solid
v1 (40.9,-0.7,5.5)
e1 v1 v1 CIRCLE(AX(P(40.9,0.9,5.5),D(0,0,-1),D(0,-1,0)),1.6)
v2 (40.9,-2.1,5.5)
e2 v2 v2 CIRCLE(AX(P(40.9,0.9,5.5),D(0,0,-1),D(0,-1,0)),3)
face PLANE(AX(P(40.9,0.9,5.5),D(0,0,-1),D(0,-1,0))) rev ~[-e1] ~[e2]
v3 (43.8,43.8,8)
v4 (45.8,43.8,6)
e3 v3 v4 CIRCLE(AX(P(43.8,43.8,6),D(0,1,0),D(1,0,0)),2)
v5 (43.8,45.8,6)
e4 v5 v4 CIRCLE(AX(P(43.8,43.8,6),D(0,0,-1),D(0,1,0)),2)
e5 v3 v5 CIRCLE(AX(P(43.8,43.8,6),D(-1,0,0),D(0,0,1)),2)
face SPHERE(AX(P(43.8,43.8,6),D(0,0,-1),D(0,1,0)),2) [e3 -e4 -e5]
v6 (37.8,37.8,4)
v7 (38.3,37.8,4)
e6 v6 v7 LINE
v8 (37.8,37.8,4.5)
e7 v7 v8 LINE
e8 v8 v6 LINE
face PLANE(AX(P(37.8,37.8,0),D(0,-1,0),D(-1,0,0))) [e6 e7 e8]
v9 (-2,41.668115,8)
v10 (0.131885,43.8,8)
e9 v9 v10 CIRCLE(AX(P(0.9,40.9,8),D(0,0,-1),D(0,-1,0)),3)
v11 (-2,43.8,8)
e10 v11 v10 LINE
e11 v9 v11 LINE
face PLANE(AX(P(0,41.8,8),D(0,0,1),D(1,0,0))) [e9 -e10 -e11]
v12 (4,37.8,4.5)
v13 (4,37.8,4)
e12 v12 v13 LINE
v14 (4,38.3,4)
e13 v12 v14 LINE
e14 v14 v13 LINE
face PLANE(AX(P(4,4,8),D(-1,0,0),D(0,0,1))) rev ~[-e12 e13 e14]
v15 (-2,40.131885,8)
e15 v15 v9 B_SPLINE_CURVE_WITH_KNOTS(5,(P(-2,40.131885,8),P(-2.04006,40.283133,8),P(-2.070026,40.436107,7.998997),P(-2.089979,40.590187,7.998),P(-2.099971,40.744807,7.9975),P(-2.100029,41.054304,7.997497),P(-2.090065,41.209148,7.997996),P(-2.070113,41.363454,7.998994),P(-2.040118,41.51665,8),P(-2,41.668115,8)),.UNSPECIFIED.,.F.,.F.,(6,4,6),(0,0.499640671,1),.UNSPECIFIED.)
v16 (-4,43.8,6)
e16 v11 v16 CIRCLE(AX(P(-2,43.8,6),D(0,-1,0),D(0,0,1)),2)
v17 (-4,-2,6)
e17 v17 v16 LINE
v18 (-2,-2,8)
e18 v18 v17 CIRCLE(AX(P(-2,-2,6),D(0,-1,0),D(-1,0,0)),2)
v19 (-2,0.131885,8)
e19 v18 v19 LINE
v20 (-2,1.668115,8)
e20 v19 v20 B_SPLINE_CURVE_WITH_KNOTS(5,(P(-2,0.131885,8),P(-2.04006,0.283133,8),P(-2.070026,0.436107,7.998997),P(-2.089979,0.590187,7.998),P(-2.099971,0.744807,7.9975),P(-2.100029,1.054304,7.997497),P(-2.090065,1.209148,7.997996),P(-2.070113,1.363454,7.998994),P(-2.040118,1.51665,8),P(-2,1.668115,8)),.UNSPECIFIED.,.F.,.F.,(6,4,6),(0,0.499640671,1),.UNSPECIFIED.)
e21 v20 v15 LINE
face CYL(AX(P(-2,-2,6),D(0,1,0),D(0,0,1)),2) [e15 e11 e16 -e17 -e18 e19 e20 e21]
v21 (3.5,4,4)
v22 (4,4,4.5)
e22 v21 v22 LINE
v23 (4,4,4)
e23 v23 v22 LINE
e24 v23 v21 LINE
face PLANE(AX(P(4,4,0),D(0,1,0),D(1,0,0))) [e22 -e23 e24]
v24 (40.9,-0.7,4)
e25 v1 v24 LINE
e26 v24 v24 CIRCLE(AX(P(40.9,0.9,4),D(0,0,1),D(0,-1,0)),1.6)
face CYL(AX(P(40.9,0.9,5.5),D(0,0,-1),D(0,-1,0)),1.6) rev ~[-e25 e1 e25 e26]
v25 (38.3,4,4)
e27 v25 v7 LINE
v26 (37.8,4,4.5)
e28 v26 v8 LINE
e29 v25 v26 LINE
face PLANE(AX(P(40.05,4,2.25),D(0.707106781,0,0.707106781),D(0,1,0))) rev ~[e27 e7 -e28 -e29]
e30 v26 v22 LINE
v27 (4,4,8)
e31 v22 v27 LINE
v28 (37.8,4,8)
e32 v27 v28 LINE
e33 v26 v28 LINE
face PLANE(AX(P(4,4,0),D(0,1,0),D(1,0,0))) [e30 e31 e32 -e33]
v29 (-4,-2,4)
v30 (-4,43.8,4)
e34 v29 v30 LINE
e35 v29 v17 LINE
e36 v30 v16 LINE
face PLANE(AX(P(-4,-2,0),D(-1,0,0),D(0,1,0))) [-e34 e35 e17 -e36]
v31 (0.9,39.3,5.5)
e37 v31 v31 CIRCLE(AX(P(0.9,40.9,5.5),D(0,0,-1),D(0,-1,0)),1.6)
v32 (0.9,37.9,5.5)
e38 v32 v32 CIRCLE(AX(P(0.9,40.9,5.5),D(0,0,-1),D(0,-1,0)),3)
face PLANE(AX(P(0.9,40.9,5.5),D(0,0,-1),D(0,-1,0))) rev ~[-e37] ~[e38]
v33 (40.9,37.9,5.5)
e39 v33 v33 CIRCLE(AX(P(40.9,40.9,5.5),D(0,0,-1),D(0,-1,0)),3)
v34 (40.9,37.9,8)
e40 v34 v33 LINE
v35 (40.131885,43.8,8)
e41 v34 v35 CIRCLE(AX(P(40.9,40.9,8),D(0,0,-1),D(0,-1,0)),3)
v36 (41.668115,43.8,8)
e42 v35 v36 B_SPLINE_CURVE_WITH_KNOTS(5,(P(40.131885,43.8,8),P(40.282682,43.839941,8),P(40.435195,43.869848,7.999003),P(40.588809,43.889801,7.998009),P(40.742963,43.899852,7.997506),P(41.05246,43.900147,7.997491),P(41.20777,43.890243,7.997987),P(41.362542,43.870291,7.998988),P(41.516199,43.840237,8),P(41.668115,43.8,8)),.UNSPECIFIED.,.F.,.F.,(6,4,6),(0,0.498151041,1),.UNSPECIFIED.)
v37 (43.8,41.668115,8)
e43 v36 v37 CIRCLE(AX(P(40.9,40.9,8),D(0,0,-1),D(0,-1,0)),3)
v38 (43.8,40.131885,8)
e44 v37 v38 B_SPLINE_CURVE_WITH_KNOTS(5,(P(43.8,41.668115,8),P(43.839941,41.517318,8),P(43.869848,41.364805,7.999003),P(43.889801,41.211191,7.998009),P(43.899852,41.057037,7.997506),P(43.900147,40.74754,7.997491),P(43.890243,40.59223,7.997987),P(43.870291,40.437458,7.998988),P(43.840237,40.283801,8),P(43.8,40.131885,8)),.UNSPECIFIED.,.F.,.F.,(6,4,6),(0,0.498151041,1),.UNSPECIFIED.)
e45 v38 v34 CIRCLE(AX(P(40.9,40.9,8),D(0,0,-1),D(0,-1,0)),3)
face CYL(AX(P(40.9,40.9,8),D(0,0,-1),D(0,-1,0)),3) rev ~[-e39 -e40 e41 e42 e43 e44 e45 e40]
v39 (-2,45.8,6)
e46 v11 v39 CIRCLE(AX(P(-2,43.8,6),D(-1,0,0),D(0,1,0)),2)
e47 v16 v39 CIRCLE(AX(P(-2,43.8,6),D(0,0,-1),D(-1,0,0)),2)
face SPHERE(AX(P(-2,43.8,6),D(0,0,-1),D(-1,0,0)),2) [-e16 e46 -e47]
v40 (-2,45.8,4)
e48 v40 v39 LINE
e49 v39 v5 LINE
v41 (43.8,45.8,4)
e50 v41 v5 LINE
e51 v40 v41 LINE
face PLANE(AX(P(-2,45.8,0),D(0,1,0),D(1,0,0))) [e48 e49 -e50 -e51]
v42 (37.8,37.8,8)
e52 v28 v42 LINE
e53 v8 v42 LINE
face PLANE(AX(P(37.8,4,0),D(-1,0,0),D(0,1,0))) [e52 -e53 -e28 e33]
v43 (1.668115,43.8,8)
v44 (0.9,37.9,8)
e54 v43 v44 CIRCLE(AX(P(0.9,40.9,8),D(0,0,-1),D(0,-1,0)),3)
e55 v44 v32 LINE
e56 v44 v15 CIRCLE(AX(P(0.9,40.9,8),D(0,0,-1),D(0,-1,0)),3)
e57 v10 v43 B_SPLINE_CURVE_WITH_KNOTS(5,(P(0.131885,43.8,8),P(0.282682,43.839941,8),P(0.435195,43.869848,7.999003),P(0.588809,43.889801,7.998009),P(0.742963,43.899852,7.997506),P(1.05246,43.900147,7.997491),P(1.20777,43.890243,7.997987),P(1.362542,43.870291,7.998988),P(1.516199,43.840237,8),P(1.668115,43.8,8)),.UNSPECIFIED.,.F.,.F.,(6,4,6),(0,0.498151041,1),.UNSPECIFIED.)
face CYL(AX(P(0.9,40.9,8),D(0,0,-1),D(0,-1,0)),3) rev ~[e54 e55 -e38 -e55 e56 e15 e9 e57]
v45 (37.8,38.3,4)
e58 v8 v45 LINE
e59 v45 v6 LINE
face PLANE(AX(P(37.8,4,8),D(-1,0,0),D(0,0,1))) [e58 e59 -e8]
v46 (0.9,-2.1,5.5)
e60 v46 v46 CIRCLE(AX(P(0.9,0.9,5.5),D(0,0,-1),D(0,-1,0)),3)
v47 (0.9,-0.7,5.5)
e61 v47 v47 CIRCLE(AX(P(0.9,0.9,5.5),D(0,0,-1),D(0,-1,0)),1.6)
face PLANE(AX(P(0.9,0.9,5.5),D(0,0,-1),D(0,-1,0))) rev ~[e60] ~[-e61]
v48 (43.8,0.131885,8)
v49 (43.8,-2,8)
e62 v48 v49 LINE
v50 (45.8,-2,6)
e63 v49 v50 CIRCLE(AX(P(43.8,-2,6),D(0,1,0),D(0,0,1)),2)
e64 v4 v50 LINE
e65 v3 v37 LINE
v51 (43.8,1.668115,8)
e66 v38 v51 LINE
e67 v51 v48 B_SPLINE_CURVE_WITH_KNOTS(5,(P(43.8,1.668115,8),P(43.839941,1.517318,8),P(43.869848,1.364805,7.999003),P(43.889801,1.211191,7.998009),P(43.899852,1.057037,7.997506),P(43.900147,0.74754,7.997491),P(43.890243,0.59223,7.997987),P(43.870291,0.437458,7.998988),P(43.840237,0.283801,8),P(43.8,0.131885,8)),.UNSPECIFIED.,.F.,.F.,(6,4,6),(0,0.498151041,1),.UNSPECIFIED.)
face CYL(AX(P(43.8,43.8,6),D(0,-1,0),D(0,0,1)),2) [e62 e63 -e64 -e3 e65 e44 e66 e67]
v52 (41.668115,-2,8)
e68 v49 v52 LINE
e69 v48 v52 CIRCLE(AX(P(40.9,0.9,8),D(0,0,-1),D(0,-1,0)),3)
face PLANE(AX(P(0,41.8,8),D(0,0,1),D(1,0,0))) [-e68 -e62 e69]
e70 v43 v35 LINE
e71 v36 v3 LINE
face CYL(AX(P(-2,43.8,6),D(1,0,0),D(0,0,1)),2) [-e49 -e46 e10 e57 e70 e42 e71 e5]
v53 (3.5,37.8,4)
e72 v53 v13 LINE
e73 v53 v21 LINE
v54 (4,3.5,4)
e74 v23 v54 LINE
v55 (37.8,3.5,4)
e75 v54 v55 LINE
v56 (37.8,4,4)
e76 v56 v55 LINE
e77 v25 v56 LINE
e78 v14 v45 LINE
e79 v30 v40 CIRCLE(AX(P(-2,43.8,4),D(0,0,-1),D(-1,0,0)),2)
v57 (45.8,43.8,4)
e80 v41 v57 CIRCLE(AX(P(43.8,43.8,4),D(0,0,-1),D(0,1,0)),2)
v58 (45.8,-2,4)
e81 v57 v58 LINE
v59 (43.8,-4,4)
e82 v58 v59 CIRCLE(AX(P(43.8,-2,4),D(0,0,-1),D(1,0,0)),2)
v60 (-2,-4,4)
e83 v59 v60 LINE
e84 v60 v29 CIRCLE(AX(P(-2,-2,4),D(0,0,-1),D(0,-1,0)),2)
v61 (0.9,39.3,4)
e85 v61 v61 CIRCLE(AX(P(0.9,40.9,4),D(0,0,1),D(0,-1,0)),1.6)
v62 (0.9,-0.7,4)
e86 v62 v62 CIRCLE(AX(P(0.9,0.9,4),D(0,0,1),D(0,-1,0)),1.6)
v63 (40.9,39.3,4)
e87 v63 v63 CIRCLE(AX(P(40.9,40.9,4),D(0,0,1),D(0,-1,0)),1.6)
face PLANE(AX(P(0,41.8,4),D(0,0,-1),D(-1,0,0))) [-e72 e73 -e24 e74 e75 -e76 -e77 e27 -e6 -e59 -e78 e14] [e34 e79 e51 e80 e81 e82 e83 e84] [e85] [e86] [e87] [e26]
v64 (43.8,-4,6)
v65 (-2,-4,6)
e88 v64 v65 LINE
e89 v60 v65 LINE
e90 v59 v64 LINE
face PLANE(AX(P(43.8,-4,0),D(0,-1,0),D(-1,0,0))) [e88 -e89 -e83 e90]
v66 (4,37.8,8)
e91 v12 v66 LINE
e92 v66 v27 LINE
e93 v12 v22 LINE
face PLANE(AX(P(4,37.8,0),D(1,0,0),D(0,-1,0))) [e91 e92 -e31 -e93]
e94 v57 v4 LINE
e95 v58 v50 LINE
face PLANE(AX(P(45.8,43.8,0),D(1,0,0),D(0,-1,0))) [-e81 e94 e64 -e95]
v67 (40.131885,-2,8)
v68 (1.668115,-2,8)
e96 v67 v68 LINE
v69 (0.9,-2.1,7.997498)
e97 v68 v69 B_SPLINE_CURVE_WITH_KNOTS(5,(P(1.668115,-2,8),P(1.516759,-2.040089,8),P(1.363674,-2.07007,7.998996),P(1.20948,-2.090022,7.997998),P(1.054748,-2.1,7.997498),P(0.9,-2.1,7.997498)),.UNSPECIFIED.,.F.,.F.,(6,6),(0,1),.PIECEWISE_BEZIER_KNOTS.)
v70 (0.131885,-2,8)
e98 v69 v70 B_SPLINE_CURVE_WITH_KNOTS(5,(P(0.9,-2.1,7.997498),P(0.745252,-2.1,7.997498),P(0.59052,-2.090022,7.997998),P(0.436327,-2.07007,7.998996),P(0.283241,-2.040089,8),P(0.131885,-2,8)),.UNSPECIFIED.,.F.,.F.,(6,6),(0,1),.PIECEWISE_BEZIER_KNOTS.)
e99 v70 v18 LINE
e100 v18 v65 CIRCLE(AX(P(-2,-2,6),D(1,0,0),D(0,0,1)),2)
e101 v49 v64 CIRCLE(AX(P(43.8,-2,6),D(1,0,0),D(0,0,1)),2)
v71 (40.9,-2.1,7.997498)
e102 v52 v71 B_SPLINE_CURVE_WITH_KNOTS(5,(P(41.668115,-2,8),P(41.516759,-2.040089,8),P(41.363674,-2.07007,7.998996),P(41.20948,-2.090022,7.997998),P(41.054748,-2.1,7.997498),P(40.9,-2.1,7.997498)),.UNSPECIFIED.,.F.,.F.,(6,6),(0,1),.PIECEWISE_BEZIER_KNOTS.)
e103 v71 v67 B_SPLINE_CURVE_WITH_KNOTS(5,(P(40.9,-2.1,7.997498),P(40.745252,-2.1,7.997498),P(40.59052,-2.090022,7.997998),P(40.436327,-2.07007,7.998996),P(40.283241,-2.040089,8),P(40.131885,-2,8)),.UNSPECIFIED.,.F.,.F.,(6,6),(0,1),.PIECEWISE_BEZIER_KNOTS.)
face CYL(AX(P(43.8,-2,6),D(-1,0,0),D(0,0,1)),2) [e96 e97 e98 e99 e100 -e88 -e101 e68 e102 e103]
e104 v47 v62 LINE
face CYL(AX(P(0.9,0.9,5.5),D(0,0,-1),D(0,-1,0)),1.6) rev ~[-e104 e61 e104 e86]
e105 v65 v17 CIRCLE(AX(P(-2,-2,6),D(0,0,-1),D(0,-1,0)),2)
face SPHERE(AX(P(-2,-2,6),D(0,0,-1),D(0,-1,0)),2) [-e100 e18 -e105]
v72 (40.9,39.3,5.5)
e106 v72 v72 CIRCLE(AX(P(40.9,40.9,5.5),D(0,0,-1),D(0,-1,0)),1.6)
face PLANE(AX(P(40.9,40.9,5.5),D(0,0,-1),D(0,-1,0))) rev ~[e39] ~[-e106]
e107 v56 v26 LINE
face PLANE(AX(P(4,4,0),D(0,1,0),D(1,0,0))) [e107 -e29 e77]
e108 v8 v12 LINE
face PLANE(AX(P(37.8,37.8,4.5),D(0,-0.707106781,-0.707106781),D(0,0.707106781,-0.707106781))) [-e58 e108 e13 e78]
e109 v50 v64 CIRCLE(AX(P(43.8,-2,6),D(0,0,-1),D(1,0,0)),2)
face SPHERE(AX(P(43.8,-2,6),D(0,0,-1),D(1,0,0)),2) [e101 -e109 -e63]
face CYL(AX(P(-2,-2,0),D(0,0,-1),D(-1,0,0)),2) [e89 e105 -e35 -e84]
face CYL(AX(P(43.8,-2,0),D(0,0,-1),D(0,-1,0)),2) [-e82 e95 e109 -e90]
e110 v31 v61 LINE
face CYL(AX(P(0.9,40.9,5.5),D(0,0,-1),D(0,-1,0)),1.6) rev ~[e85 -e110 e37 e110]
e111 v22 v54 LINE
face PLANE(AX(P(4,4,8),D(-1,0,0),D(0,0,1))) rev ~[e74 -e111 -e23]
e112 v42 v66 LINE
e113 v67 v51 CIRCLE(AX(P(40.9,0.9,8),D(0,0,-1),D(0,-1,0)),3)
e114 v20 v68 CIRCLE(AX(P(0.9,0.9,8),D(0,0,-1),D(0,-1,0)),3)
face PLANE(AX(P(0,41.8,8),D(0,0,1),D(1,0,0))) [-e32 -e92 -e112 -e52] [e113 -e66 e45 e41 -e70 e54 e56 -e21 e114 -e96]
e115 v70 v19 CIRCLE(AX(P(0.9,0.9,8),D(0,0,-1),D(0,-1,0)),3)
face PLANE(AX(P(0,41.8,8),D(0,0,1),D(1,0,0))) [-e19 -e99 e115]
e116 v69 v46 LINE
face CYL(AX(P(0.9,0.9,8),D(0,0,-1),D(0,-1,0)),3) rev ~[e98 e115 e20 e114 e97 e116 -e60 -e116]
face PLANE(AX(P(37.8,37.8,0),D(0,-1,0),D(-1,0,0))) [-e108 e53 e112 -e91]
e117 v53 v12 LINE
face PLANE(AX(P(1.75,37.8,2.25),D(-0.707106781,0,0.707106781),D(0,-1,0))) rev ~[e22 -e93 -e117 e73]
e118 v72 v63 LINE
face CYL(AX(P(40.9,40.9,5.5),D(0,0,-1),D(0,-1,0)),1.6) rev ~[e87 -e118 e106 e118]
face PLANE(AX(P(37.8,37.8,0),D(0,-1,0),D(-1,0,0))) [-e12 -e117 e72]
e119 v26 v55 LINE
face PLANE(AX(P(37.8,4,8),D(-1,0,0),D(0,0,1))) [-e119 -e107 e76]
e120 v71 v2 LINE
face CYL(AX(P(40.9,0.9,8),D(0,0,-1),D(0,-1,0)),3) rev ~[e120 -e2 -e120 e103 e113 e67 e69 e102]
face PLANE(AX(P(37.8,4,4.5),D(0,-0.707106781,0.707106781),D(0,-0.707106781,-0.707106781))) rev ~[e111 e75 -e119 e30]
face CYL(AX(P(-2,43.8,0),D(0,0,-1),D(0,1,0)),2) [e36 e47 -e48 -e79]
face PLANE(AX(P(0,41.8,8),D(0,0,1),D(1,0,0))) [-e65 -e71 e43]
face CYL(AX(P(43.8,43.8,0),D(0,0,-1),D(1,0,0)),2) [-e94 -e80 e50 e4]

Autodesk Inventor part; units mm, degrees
ref_plane "YZ Plane" through (0, 0, 0) normal (1, 0, 0) x (0, 1, 0)
ref_plane "XZ Plane" through (0, 0, 0) normal (0, 1, 0) x (-1, 0, 0)
ref_plane "XY Plane" through (0, 0, 0) normal (0, 0, 1) x (1, 0, 0)
ref_plane "Work Plane1" through (0, 41.8, 0) normal (0, 0, 1) x (1, 0, 0)
sketch "Sketch1" plane through (0, 41.8, 0) normal (0, 0, 1) x (1, 0, 0)
  line L0 (4, 0.3838) -> (4, 4) construction
  line L1 (4, 4) -> (-2, 4) construction
  arc A0 (-2, 4) -> (-4, 2) centre (-2, 2) ccw construction
  line L2 (-4, 2) -> (-4, -4) construction
  line L3 (-4, -4) -> (-0.3838, -4) construction
  arc A1 (45.8, 2) -> (43.8, 4) centre (43.8, 2) ccw construction
  line L4 (43.8, 4) -> (37.8, 4) construction
  line L5 (37.8, 4) -> (37.8, 0.3838) construction
  line L6 (42.1838, -4) -> (45.8, -4) construction
  line L7 (45.8, -4) -> (45.8, 2) construction
  line L8 (37.8, -42.1838) -> (37.8, -45.8) construction
  line L9 (37.8, -45.8) -> (43.8, -45.8) construction
  arc A2 (43.8, -45.8) -> (45.8, -43.8) centre (43.8, -43.8) ccw construction
  line L10 (45.8, -43.8) -> (45.8, -37.8) construction
  line L11 (45.8, -37.8) -> (42.1838, -37.8) construction
  line L12 (-0.3838, -37.8) -> (-4, -37.8) construction
  line L13 (-4, -37.8) -> (-4, -43.8) construction
  arc A3 (-4, -43.8) -> (-2, -45.8) centre (-2, -43.8) ccw construction
  line L14 (-2, -45.8) -> (4, -45.8) construction
  line L15 (4, -45.8) -> (4, -42.1838) construction
  line L16 (-2, 4) -> (43.8, 4)
  line L17 (45.8, 2) -> (45.8, -43.8)
  line L18 (43.8, -45.8) -> (-2, -45.8)
  line L19 (-4, -43.8) -> (-4, 2)
  line L20 (40.3, -37.8) -> (40.3, -4)
  line L21 (37.8, -1.5) -> (4, -1.5)
  line L22 (1.5, -4) -> (1.5, -37.8)
  line L23 (4, -40.3) -> (37.8, -40.3)
  line L24 (37.8, -40.3) -> (40.3, -37.8)
  line L25 (4, -40.3) -> (1.5, -37.8)
  line L26 (4, -1.5) -> (1.5, -4)
  line L27 (40.3, -4) -> (37.8, -1.5)
  arc A4 (45.8, 2) -> (43.8, 4) centre (43.8, 2) ccw
  arc A5 (43.8, -45.8) -> (45.8, -43.8) centre (43.8, -43.8) ccw
  arc A6 (-4, -43.8) -> (-2, -45.8) centre (-2, -43.8) ccw
  arc A7 (-2, 4) -> (-4, 2) centre (-2, 2) ccw
  circle A8 centre (1, -1) radius 1.4
  circle A9 centre (40.8, -1) radius 1.4
  circle A10 centre (40.8, -40.8) radius 1.4
  circle A11 centre (1, -40.8) radius 1.4
  circle A12 centre (20.9, -20.9) radius 19.4 construction
  line L28 (4, -4) -> (4, -37.8)
  line L29 (4, -37.8) -> (37.8, -37.8)
  line L30 (37.8, -37.8) -> (37.8, -4)
  line L31 (37.8, -4) -> (4, -4)
  arc A13 (39.5978, -40.386) -> (40.386, -39.5978) centre (40.9, -40.9) ccw projected
  line L32 (39.5978, -40.386) -> (37.8, -42.1838) projected
  line L33 (42.1838, -37.8) -> (40.386, -39.5978) projected
  arc A14 (1.414, -39.5978) -> (2.2022, -40.386) centre (0.9, -40.9) ccw projected
  line L34 (1.414, -39.5978) -> (-0.3838, -37.8) projected
  line L35 (4, -42.1838) -> (2.2022, -40.386) projected
  arc A15 (40.386, -2.2022) -> (39.5978, -1.414) centre (40.9, -0.9) ccw projected
  line L36 (40.386, -2.2022) -> (42.1838, -4) projected
  line L37 (37.8, 0.3838) -> (39.5978, -1.414) projected
  arc A16 (2.2022, -1.414) -> (1.414, -2.2022) centre (0.9, -0.9) ccw projected
  line L38 (2.2022, -1.414) -> (4, 0.3838) projected
  line L39 (-0.3838, -4) -> (1.414, -2.2022) projected
  point P0 (45.8, -45.8)
  point P1 (45.8, 4)
  point P2 (-4, -45.8)
  point P3 (40.3, -40.3)
  point P4 (40.3, -1.5)
  point P5 (1.5, -1.5)
  point P6 (1.5, -40.3)
  point P7 (40.8, -1)
  dimension "d55" = 2.8
  dimension "d56" = 2.8
  dimension "d57" = 2.8
  dimension "d58" = 2.8
  dimension "d34" = 49.8
  dimension "d35" = 49.8
  dimension "d36" = 5.5
  dimension "d37" = 2.5
  dimension "d38" = 2.5
  dimension "d39" = 2.5
  dimension "d40" = 2.5
  dimension "d41" = 2.5
  dimension "d42" = 2.5
  dimension "d43" = 2.5
  dimension "d44" = 2.5
  dimension "d45" = 2
  dimension "d46" = 5
  dimension "d47" = 5
  dimension "d48" = 5
  dimension "d49" = 5
  dimension "d50" = 5
  dimension "d51" = 5
  dimension "d52" = 0.5
  dimension "d53" = 5
  dimension "d54" = 5
  dimension "d90" = 8
extrude "Extrusion1" add sketch "Sketch1" along normal blind 8 contours L16 A4 L17 A5 L18 A6 L19 A7 | L24 L23 L25 L22 L26 L21 L27 L20 | A8 A16 | A9 A15 | A10 A13 | A14 A11
fillet "Fillet1" radius 2 8 edges at (20.9, -4, 8) (45.2142, -3.4142, 8) (45.8, 20.9, 8) (45.2142, 45.2142, 8) (20.9, 45.8, 8) (-3.4142, 45.2142, 8) (-4, 20.9, 8) (-3.4142, -3.4142, 8)
sketch "Sketch2" plane through (-2, -4, 0) normal (0, -1, 0) x (1, 0, 0)
  line L0 (43.8, -4.8712) -> (42.35, -4)
  line L1 (2, -4.8712) -> (0.55, -4)
  line L2 (-2, 0) -> (-2, 6) construction
  line L3 (45.8, 8) -> (0, 8) construction
  line L4 (47.8, 0) -> (47.8, 6) construction
  circle A0 centre (2.9, -36.9) radius 1.45 projected
  line L5 (0, -41.8) -> (45.8, -41.8) projected
  point P0 (2, 0)
  point P1 (2.9, 3.1)
  point P2 (42.9, 3.1)
  dimension "d59" = 4.9
  dimension "d60" = 4.9
  dimension "d61" = 4.9
  dimension "d62" = 4.9
hole "Hole1" [suppressed]
sketch "Sketch3" plane through (0, 41.8, 8) normal (0, 0, 1) x (1, 0, 0)
  circle A0 centre (20.9, -20.9) radius 16.9 construction
  point P0 (0, -41.8)
sketch "Sketch4" plane through (0, 41.8, 8) normal (0, 0, 1) x (1, 0, 0)
  line L0 (37.8, -37.8) -> (37.8, -4) projected
  line L1 (37.8, -4) -> (4, -4) projected
  line L2 (4, -4) -> (4, -37.8) projected
  line L3 (4, -37.8) -> (37.8, -37.8) projected
  circle A0 centre (40.9, -0.9) radius 2.75 projected
  circle A1 centre (0.9, -40.9) radius 2.75 projected
  circle A2 centre (0.9, -0.9) radius 2.75 projected
  circle A3 centre (40.9, -40.9) radius 2.75 projected
  line L4 (43.8, 2) -> (-2, 2) projected
  line L5 (43.8, -43.8) -> (43.8, 2) projected
  line L6 (-2, -43.8) -> (43.8, -43.8) projected
  line L7 (-2, 2) -> (-2, -43.8) projected
hole "Hole2" at (40.9, 40.9, 8) at (40.9, 0.9, 8) at (0.9, 0.9, 8) at (0.9, 40.9, 8) direction (0, 0, -1) diameter 3.2 depth 12 tip angle 118 counterbore diameter 6 counterbore depth 2.5
chamfer "Chamfer2" distance 4.5 angle 45 2 edges at (4, 20.9, 0) (37.8, 20.9, 0)
sketch "Sketch6" plane through (-4, -2, 0) normal (-1, 0, 0) x (0, 0, 1)
  line L0 (0, -2) -> (6, -2) construction
  line L1 (8, 0) -> (8, 45.8) construction
  line L2 (0, 47.8) -> (6, 47.8) construction
  circle A0 centre (3.1, 42.9) radius 1.4 construction
  circle A1 centre (3.1, 2.9) radius 1.4 construction
  point P0 (0, 2)
  dimension "d63" = 2.8
  dimension "d64" = 2.8
  dimension "d65" = 4.9
  dimension "d66" = 4.9
  dimension "d67" = 4.9
  dimension "d68" = 4.9
hole "Hole3" [suppressed]
sketch "Sketch7" plane through (45.8, -2, 0) normal (1, 0, 0) x (0, 0, -1)
  circle A0 centre (-3.1, 42.9) radius 1.4 projected
  circle A1 centre (-3.1, 2.9) radius 1.4 projected
  point P0 (0, 2)
hole "Hole4" [suppressed]
sketch "Sketch8" plane through (-2, 45.8, 0) normal (0, 1, 0) x (1, 0, 0)
  circle A0 centre (2.9, -3.1) radius 1.45 projected
  circle A1 centre (42.9, -3.1) radius 1.45 projected
  point P0 (2, 0)
  point P1 (4.35, -3.1)
  point P2 (4.35, -3.1)
  point P3 (44.35, -3.1)
  point P4 (44.35, -3.1)
hole "Hole5" [suppressed]
sketch "Sketch9" plane through (37.8, 4, 8) normal (-1, 0, 0) x (0, 0, 1)
  line L0 (-8, 0) -> (-3.5, 0) projected
  line L1 (-3.5, 33.8) -> (-8, 33.8) projected
  line L2 (-3.5, 0) -> (-8, -4.5)
  line L3 (-8, 39.8) -> (-8, -6) projected
  line L4 (-3.5, 0) -> (2.864, 0) construction
  line L5 (-8, -4.5) -> (-8, 0)
  line L6 (-3.5, 33.8) -> (-8, 38.3)
  line L7 (-3.5, 33.8) -> (2.864, 33.8) construction
  line L8 (-8, 38.3) -> (-8, 33.8)
  line L9 (-8, 33.8) -> (-3.5, 33.8)
  point P0 (-8, -4)
  dimension "d91" = 135
  dimension "d92" = 135
extrude "Extrusion3" cut sketch "Sketch9" along normal up to surface (33.8 mm away)
sketch "Sketch13" plane through (0, 41.8, 0) normal (0, 0, -1) x (-1, 0, 0)
  line L0 (-37.8, -42.3) -> (-37.8, -37.8) projected
  line L1 (-37.8, -37.8) -> (-42.3, -37.8) projected
  line L2 (-42.3, -4) -> (-42.3, -37.8) projected
  line L3 (-42.3, -4) -> (-37.8, -4) projected
  line L4 (-37.8, -4) -> (-37.8, 0.5) projected
  line L5 (-37.8, 0.5) -> (-4, 0.5) projected
  line L6 (-4, 0.5) -> (-4, -4) projected
  line L7 (-4, -4) -> (0.5, -4) projected
  line L8 (0.5, -37.8) -> (0.5, -4) projected
  line L9 (0.5, -37.8) -> (-4, -37.8) projected
  line L10 (-4, -37.8) -> (-4, -42.3) projected
  line L11 (-4, -42.3) -> (-37.8, -42.3) projected
  circle A0 centre (-0.9, -40.9) radius 1.6 projected
  circle A1 centre (-40.9, -0.9) radius 1.6 projected
  circle A2 centre (-40.9, -40.9) radius 1.6 projected
  circle A3 centre (-0.9, -0.9) radius 1.6 projected
  line L12 (-45.8, 2) -> (-45.8, -43.8) projected
  arc A4 (-45.8, -43.8) -> (-43.8, -45.8) centre (-43.8, -43.8) ccw projected
  line L13 (-43.8, -45.8) -> (2, -45.8) projected
  arc A5 (2, -45.8) -> (4, -43.8) centre (2, -43.8) ccw projected
  line L14 (4, -43.8) -> (4, 2) projected
  arc A6 (4, 2) -> (2, 4) centre (2, 2) ccw projected
  line L15 (2, 4) -> (-43.8, 4) projected
  arc A7 (-43.8, 4) -> (-45.8, 2) centre (-43.8, 2) ccw projected
  point P0 (0, -41.8)
extrude "Extrusion5" cut sketch "Sketch13" against normal blind 4 contours L0 L1 L2 L3 L4 L5 L6 L7 L8 L9 L10 L11 | A7 L15 A6 L14 A5 L13 A4 L12
equation "\"d38\" = d37"
equation "\"d39\" = d37"
equation "\"d40\" = d39"
equation "\"d41\" = d37"
equation "\"d42\" = d41"
equation "\"d43\" = d37"
equation "\"d44\" = d43"
properties part number "10_Lid_1x1_v2_thin"
